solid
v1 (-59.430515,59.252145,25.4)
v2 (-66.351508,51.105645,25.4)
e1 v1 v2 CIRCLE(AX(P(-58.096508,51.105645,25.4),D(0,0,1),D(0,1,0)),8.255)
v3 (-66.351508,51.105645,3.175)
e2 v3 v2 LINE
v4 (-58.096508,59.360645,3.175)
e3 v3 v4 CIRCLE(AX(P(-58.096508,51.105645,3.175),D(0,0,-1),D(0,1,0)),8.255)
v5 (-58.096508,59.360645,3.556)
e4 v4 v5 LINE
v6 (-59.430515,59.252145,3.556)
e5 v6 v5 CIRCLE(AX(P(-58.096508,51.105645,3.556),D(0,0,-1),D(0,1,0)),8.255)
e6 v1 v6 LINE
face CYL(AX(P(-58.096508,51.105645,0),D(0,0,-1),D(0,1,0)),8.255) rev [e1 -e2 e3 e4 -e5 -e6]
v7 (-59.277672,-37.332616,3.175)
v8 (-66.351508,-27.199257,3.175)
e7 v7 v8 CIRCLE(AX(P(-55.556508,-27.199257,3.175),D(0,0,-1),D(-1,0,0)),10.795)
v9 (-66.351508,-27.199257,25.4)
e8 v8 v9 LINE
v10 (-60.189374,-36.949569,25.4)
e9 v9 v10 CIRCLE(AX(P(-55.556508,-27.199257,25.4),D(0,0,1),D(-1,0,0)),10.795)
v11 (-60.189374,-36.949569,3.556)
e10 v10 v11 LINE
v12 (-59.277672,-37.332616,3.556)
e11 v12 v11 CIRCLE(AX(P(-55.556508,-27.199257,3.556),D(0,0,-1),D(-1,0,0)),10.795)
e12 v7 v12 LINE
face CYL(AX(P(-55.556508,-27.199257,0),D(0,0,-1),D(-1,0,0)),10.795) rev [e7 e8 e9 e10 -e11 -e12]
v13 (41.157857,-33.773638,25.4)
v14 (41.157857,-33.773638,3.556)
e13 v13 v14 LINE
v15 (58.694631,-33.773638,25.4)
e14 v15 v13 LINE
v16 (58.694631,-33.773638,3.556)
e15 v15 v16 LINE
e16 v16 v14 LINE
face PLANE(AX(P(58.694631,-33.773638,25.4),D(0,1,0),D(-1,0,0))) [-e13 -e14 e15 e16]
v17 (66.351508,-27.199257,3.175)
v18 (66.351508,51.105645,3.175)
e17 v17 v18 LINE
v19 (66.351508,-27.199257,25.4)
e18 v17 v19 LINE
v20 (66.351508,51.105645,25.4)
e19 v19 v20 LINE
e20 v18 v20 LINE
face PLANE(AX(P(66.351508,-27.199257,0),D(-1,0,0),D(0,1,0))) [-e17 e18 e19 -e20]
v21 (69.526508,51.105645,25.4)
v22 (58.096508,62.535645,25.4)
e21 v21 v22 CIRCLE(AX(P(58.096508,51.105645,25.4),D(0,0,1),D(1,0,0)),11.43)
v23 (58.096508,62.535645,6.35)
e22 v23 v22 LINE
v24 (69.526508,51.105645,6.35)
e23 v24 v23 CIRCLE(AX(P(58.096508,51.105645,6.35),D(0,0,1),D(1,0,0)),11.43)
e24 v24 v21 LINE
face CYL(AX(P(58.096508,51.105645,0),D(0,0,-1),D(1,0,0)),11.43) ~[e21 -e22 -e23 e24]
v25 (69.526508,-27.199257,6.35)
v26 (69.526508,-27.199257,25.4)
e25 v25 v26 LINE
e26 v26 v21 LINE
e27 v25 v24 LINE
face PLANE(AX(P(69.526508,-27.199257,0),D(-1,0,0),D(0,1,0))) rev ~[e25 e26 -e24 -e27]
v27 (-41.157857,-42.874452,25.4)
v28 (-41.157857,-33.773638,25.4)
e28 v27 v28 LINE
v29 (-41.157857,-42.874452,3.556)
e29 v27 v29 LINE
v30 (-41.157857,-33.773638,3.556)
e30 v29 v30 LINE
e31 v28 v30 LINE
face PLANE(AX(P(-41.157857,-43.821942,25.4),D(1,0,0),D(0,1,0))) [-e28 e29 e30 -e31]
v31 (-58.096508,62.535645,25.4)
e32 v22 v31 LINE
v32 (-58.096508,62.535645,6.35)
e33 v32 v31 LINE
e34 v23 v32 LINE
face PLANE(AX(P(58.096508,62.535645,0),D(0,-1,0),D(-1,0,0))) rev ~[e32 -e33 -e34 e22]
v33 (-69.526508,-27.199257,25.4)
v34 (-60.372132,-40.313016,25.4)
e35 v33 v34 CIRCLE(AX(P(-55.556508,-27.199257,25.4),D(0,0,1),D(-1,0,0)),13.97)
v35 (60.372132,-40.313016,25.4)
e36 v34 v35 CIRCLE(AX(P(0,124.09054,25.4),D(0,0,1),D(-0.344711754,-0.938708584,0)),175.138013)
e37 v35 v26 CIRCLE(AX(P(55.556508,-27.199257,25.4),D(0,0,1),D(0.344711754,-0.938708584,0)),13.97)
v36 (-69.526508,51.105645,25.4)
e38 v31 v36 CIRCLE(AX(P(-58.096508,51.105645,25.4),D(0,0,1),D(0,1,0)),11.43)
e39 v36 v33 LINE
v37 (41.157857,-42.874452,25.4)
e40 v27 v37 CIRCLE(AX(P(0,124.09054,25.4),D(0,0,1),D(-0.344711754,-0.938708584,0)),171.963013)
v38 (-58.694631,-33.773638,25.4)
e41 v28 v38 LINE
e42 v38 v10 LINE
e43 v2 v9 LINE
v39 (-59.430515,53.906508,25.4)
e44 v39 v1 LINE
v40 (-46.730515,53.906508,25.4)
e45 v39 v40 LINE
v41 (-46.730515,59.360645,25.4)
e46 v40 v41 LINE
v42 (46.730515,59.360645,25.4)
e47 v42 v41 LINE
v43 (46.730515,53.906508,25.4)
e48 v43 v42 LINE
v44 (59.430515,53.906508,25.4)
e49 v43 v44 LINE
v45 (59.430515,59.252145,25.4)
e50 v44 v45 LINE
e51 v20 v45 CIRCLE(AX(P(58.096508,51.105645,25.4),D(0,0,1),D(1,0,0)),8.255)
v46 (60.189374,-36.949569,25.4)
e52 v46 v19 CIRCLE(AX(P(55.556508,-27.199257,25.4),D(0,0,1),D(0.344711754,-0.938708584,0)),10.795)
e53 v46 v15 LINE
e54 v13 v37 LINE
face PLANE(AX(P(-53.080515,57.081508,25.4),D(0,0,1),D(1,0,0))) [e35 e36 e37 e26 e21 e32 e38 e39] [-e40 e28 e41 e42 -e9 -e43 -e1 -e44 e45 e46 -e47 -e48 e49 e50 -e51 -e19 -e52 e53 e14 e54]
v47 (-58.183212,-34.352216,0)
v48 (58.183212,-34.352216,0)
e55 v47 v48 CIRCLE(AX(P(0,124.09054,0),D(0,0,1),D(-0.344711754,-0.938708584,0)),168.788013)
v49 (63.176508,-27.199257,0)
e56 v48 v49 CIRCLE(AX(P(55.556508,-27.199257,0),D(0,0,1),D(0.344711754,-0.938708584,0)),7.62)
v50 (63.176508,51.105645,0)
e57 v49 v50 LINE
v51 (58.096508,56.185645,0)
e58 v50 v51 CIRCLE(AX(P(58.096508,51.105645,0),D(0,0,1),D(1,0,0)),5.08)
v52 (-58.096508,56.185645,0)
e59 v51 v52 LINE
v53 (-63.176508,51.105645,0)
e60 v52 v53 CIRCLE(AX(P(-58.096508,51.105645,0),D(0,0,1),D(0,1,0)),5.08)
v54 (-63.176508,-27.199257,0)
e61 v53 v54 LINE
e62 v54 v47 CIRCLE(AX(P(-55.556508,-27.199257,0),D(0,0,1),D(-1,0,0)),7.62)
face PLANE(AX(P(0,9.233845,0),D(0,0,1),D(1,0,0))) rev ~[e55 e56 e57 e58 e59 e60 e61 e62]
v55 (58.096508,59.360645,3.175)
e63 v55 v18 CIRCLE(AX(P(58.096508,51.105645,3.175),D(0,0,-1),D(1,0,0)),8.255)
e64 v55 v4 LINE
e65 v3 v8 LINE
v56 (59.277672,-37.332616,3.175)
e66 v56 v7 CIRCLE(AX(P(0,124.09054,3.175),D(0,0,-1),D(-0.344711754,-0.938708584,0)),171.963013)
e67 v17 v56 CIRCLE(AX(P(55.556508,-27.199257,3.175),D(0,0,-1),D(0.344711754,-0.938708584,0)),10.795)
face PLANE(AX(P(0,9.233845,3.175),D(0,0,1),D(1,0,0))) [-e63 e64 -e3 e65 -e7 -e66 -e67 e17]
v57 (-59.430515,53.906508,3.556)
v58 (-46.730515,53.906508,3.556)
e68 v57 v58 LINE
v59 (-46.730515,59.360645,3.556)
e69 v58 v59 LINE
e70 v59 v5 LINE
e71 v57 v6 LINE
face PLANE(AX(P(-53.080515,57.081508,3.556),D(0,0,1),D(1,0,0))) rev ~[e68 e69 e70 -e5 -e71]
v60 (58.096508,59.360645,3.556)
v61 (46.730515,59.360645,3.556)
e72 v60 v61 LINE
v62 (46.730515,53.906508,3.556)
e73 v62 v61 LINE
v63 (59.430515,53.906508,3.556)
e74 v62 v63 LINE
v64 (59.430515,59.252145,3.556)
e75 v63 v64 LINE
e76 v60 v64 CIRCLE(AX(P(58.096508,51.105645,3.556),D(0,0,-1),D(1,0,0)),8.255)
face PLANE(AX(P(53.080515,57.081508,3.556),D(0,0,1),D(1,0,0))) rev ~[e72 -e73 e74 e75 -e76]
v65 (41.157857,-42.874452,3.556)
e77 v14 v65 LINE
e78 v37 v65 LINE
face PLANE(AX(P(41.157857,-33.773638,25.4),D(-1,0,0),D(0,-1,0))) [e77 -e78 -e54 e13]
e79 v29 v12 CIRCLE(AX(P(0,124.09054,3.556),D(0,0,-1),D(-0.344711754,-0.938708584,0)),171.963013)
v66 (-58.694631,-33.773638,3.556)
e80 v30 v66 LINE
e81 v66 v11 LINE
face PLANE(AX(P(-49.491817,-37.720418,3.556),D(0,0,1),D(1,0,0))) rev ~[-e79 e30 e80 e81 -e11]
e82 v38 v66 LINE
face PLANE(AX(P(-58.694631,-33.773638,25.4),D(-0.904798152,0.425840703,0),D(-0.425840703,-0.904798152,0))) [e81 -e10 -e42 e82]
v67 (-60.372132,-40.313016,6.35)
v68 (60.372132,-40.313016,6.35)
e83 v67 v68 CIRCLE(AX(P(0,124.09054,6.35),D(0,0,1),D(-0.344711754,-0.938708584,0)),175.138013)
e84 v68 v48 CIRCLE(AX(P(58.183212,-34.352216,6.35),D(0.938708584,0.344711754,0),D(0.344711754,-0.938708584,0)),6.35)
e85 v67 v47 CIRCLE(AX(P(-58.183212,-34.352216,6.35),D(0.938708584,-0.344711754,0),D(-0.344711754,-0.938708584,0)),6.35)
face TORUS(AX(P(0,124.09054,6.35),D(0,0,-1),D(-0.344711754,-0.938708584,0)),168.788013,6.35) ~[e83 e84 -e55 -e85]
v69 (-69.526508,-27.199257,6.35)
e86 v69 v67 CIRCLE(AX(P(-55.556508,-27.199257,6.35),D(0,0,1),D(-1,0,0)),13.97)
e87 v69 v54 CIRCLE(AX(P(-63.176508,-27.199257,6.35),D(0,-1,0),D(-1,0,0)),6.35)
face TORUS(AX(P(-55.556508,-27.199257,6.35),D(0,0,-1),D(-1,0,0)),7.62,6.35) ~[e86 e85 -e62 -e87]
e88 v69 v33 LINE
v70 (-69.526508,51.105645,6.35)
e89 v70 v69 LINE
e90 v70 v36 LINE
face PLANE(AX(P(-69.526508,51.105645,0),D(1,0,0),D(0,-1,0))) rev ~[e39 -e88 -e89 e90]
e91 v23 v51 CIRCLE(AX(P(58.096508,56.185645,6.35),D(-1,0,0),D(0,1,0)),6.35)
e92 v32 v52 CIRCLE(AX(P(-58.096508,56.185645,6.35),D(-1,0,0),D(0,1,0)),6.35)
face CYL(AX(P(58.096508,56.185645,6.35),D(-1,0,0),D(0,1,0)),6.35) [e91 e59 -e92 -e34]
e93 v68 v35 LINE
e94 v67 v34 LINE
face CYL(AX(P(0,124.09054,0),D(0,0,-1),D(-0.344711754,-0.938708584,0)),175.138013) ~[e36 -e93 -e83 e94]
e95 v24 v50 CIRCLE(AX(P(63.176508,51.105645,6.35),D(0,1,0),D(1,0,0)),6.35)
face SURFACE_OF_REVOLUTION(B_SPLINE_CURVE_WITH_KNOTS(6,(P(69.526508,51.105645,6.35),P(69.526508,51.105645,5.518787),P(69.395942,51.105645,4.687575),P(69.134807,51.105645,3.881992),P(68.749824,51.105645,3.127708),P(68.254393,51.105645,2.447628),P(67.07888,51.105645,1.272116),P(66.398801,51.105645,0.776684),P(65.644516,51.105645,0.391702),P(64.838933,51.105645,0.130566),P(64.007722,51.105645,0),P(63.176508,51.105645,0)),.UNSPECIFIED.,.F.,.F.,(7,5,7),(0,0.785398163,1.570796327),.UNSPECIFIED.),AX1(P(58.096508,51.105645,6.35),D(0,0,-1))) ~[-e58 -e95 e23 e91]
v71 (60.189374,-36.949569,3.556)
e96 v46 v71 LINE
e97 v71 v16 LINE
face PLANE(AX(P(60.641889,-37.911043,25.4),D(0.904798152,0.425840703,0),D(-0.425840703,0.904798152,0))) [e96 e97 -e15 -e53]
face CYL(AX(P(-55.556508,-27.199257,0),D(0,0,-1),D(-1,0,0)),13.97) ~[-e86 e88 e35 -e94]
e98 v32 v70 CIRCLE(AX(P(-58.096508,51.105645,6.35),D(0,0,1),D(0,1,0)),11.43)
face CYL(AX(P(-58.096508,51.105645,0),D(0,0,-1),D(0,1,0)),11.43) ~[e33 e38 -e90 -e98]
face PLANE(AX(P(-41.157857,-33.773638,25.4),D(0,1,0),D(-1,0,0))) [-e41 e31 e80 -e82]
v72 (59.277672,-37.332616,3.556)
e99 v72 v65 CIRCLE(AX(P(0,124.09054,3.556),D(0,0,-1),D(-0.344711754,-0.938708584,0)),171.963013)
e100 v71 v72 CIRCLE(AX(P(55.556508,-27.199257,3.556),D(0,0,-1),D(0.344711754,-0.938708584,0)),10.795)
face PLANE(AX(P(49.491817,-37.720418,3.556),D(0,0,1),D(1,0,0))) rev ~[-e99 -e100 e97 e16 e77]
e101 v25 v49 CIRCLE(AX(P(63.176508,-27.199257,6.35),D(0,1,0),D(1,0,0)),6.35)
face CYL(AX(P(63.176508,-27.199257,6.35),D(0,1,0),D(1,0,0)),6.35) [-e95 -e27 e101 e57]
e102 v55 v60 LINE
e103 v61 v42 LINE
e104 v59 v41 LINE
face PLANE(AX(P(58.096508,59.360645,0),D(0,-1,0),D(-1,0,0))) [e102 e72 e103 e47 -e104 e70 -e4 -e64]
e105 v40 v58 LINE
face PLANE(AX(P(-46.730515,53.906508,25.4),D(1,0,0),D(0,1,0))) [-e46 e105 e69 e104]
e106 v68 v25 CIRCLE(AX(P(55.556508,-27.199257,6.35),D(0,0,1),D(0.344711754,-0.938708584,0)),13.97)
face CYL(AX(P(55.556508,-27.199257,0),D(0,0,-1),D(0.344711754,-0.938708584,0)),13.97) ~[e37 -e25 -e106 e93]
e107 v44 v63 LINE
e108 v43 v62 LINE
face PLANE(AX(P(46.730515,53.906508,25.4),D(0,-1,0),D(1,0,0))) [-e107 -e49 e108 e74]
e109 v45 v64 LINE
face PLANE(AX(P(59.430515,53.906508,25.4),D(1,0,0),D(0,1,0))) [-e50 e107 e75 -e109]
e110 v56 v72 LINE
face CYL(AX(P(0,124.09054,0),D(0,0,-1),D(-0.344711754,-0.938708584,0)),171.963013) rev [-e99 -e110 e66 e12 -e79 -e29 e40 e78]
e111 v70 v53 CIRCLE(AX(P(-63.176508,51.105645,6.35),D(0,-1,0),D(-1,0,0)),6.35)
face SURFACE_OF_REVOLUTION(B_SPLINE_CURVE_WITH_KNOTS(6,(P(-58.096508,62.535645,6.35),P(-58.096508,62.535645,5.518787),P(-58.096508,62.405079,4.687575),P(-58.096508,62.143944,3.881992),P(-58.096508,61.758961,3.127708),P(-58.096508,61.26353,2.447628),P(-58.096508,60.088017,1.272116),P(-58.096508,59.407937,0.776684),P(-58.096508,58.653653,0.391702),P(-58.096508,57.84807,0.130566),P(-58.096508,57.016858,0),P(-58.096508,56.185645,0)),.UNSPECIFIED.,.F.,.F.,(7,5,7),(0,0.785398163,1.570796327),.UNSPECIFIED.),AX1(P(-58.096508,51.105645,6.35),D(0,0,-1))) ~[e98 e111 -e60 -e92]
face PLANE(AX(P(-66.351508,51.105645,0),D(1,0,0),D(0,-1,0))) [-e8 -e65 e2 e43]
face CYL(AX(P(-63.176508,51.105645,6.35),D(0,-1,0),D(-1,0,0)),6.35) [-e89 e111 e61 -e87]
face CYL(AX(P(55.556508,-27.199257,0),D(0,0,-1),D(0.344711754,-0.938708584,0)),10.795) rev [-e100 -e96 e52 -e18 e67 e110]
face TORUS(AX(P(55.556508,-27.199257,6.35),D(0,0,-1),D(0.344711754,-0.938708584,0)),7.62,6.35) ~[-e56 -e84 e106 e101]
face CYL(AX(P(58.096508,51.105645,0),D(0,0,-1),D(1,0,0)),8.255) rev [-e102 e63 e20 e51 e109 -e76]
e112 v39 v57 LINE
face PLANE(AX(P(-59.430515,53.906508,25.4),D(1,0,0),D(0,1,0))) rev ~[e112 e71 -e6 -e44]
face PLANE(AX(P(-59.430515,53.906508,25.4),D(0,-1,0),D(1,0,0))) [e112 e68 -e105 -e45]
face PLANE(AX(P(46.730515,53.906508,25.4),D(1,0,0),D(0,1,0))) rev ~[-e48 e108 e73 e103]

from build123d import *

# Parameters (mm, degrees)
F1_DEPTH = 25.4
F2_T     = -3.175
F3_R     = 6.35
F5_W     = 12.7
F5_H     = 6.35
F6_DEPTH = 21.844


# Not quite as in the source:
# - a feature names something its author has since deleted; it is built from what else it names


with BuildPart() as f1:
    # F0 (on Top) → F1 (new body)
    with BuildSketch(Plane.XY):
        with BuildLine():
            Line((58.0965084505, 62.5356453779), (-58.0965084505, 62.5356453779))
            ThreePointArc((-58.0965084505, 62.5356453779), (-66.1787389595, 59.1878758868), (-69.5265084505, 51.1056453779))
            Line((-69.5265084505, 51.1056453779), (-69.5265084505, -27.1992570698))
            ThreePointArc((-69.5265084505, -27.1992570698), (-67.0115325937, -35.1957139026), (-60.3721316603, -40.3130159932))
            ThreePointArc((-60.3721316603, -40.3130159932), (0, -51.0474727306), (60.3721316603, -40.3130159932))
            ThreePointArc((60.3721316603, -40.3130159932), (67.0115325937, -35.1957139026), (69.5265084505, -27.1992570698))
            Line((69.5265084505, -27.1992570698), (69.5265084505, 51.1056453779))
            ThreePointArc((69.5265084505, 51.1056453779), (66.1787389595, 59.1878758868), (58.0965084505, 62.5356453779))
        make_face()
    extrude(amount=F1_DEPTH)

    # F2
    f2_openings = [f1.faces().sort_by_distance(p)[0] for p in [
        (0, 7.919531, 25.4),
    ]]
    offset(amount=F2_T, openings=f2_openings)

    # F3
    f3_edges = [f1.edges().sort_by_distance(p)[0] for p in [
        (69.526508, 11.953194, 0),
        (66.178739, 59.187876, 0),
        (0, 62.535645, 0),
        (-66.178739, 59.187876, 0),
        (-69.526508, 11.953194, 0),
        (-67.011533, -35.195714, 0),
        (0, -51.047473, 0),
        (67.011533, -35.195714, 0),
    ]]
    fillet(f3_edges, radius=F3_R)

    # F5 (on offset) → F6 (join)
    with BuildSketch(Plane.XY.offset(25.4)):
        with Locations((-53.0805146158, 57.0815077901)):
            Rectangle(F5_W, F5_H)
        with Locations((53.0805146158, 57.0815077901)):
            Rectangle(F5_W, F5_H)
        Polygon((-41.1578565836, -33.773638308), (-58.6946308613, -33.773638308), (-60.6418885291, -37.9110425711), (-53.9016760886, -40.266495198), (-41.1578565836, -43.8219420612), align=None)
        Polygon((60.6418885291, -37.9110425711), (58.6946308613, -33.773638308), (41.1578565836, -33.773638308), (41.1578565836, -43.8219420612), (53.9016760886, -40.266495198), align=None)
    extrude(amount=-F6_DEPTH)


solid = f1.part
